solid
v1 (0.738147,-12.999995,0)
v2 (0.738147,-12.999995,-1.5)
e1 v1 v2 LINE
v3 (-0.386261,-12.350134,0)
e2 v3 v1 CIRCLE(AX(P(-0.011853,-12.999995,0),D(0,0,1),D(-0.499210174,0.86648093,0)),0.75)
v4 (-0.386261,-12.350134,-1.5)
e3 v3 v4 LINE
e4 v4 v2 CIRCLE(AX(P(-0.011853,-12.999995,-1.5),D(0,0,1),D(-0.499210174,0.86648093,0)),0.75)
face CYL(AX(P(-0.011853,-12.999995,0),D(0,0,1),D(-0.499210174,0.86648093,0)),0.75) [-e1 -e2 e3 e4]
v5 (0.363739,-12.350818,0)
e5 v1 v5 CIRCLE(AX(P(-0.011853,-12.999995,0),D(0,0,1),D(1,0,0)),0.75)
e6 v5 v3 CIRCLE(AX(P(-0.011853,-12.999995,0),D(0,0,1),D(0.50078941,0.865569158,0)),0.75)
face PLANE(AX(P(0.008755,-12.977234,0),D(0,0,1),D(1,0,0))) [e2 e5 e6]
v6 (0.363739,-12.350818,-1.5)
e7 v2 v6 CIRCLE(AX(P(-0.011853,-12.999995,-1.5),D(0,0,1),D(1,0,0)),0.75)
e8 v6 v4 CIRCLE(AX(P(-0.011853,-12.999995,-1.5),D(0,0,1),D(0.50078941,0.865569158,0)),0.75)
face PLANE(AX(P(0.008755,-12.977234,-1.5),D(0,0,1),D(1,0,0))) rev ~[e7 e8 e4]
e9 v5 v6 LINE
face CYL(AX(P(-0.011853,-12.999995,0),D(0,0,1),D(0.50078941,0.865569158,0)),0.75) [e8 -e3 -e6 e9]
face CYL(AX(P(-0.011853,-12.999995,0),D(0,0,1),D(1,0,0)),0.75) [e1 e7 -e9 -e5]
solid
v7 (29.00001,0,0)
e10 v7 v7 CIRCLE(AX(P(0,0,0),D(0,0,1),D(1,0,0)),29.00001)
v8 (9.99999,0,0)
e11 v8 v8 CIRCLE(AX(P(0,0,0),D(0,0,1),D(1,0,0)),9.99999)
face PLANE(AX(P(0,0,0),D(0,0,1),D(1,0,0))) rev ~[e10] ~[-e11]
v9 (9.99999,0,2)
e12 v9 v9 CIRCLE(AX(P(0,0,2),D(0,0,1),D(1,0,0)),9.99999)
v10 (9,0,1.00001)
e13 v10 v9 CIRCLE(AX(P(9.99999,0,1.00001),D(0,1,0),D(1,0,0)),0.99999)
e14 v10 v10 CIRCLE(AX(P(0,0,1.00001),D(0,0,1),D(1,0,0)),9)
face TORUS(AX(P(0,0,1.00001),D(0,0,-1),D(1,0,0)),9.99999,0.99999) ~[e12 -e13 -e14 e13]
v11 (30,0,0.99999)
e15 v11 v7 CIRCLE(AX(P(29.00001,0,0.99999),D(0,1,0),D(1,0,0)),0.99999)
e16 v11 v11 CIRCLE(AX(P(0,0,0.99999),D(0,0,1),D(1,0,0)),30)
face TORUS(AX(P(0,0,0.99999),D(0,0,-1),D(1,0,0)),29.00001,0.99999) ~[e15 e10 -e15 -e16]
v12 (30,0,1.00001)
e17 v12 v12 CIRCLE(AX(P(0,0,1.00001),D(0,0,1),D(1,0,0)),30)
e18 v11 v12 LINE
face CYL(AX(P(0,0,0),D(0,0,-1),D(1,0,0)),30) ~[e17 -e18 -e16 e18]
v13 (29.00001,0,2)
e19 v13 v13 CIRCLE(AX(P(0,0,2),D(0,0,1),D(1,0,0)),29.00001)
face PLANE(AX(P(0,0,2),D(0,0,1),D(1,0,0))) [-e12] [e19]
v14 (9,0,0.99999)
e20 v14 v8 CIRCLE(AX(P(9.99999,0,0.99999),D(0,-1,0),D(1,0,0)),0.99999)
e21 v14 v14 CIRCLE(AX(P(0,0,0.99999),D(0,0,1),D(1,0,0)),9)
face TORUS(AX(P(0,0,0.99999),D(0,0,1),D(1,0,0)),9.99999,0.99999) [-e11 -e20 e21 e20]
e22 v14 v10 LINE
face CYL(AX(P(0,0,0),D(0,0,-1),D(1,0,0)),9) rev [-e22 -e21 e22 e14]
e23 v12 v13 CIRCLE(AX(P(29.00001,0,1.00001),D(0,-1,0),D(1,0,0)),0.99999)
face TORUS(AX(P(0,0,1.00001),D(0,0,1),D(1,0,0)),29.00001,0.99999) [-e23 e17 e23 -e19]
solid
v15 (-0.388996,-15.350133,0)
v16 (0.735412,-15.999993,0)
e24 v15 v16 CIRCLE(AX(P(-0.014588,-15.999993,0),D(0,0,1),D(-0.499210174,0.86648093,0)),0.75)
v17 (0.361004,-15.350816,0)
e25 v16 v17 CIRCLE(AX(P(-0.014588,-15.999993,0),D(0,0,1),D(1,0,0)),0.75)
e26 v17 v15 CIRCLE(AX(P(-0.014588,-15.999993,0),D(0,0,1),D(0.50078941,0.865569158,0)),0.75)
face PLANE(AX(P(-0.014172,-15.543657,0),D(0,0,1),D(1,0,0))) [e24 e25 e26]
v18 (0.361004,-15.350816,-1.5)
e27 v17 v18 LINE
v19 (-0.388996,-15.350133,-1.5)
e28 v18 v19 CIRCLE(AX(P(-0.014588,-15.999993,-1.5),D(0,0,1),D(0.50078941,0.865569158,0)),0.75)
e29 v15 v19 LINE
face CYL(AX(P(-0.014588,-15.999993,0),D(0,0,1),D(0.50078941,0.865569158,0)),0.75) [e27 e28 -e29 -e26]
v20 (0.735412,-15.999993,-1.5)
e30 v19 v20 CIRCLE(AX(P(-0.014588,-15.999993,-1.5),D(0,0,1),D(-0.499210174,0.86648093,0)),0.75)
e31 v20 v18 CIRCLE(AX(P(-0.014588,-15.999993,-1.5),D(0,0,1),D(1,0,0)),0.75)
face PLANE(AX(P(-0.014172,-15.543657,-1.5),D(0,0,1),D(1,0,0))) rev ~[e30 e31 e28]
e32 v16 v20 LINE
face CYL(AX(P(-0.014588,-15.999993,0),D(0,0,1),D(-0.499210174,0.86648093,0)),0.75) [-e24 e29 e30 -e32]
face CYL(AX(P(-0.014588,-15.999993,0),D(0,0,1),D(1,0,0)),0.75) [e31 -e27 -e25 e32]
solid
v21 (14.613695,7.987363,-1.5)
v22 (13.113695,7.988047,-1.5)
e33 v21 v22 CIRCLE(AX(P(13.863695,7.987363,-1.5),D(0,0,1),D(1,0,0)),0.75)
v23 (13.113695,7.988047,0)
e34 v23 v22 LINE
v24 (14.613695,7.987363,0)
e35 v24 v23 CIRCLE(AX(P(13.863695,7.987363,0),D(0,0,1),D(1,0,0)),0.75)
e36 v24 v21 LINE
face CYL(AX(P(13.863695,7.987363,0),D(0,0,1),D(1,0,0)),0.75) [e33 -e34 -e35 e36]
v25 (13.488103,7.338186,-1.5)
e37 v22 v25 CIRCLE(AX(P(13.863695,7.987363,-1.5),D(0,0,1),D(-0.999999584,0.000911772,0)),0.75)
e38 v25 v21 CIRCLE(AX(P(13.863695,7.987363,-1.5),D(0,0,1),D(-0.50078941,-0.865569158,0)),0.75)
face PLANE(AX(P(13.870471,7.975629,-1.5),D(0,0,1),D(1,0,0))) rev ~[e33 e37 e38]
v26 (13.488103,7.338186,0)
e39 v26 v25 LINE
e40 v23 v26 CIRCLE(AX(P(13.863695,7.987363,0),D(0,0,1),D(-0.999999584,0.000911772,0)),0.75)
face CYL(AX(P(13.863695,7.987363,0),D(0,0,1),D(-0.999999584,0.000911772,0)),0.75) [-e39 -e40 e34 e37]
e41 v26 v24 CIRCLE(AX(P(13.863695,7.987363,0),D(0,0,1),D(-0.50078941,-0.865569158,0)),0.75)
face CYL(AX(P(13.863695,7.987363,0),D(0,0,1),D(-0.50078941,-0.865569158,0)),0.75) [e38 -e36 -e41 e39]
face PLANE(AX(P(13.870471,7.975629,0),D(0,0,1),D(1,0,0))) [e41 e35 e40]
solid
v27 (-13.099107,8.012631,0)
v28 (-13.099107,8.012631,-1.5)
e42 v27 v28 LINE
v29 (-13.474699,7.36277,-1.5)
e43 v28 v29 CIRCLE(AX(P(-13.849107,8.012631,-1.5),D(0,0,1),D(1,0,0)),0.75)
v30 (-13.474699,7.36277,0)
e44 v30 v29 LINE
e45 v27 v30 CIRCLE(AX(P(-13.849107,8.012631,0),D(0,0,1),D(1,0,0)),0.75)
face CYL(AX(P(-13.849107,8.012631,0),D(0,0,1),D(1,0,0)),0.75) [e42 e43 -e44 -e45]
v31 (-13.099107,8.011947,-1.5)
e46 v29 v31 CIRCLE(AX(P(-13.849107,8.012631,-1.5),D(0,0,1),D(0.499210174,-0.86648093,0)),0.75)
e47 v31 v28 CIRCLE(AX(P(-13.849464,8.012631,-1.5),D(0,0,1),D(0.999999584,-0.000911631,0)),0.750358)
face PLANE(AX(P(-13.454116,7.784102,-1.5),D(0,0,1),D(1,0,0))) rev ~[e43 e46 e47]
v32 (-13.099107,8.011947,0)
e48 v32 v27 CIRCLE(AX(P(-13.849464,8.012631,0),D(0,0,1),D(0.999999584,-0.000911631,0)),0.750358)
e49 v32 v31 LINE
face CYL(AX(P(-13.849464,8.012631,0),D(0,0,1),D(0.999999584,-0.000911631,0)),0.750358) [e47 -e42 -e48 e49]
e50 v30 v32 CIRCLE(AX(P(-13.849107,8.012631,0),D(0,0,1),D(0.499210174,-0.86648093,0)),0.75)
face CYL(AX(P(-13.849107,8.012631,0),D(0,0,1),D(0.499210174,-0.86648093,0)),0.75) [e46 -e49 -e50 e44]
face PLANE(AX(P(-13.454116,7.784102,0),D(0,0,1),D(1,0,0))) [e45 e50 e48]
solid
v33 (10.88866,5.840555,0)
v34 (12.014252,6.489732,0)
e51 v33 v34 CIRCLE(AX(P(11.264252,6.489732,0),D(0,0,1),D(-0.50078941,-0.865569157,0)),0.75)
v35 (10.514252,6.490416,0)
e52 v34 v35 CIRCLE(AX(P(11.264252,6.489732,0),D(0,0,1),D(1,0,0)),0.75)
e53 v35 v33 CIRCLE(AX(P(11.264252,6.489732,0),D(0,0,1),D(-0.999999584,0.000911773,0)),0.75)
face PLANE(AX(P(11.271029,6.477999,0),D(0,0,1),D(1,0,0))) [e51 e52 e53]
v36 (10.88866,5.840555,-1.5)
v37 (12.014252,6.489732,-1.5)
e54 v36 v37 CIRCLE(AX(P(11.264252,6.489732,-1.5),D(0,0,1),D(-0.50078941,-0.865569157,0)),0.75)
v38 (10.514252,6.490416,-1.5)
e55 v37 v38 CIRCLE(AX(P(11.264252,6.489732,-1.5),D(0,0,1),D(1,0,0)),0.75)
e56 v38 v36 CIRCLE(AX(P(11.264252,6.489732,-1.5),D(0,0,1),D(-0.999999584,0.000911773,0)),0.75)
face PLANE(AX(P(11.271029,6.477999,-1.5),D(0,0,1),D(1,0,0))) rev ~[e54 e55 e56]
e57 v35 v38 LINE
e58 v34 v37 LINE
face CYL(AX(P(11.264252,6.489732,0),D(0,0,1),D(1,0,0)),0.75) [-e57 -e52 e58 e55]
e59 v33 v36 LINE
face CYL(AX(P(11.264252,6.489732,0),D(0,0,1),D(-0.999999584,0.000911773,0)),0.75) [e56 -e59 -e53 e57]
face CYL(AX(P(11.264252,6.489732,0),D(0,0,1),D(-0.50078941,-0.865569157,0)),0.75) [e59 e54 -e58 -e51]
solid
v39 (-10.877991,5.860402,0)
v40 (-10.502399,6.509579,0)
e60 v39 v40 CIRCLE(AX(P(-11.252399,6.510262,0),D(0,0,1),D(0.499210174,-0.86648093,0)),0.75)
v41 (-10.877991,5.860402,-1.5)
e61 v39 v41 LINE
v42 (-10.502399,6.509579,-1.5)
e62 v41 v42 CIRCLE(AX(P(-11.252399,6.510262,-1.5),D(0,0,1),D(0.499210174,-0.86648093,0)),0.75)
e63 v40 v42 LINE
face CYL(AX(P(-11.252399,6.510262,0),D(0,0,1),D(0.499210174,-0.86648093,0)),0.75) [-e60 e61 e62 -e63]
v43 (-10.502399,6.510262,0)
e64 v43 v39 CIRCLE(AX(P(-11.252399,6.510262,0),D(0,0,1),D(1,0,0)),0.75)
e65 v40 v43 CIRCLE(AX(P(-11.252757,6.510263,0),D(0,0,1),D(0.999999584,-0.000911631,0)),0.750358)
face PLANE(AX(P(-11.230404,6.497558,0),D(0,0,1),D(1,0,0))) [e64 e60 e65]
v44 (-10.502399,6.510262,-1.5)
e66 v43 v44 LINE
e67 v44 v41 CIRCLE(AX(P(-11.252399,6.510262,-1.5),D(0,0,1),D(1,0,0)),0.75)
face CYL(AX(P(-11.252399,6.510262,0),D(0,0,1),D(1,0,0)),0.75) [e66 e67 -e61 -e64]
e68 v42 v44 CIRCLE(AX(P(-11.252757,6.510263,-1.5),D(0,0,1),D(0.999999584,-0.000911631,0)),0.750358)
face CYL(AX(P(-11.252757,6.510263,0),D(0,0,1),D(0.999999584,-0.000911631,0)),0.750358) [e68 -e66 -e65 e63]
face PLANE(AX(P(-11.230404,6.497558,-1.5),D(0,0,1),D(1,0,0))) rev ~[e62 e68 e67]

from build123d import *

# Parameters (mm, degrees)
F0_R     = 30
F0_R_2   = 9
F1_DEPTH = 2
F2_R     = 0.99999
F4_DEPTH = 1.5


# Not quite as in the source:
# - a fillet or chamfer is up to 0.001 mm smaller than in the source, because OpenCascade refuses the exact size


with BuildPart() as f1:
    # F0 (on Top) → F1 (new body)
    with BuildSketch(Plane.XY):
        Circle(F0_R)
        Circle(F0_R_2, mode=Mode.SUBTRACT)
    extrude(amount=F1_DEPTH)

    # F2 (radius 1 in the source; OpenCascade refuses exactly that, so slightly less here)
    f2_edges = [f1.edges().sort_by_distance(p)[0] for p in [
        (-9, 0, 2),
        (-9, 0, 0),
        (-30, 0, 0),
        (-30, 0, 2),
    ]]
    fillet(f2_edges, radius=F2_R)


with BuildPart() as f4:
    # F3 (on Top) → F4 (new body)
    with BuildSketch(Plane.XY):
        with BuildLine():
            Line((13.1136951927, 7.9880466137), (13.863694881, 7.9873627843))
            Line((13.863694881, 7.9873627843), (13.4881028232, 7.3381859161))
            ThreePointArc((13.4881028232, 7.3381859161), (14.2383987351, 7.3376728416), (14.613694881, 7.9873627843))
            ThreePointArc((14.613694881, 7.9873627843), (13.8640367957, 8.7373627064), (13.1136951927, 7.9880466137))
        make_face()
        with BuildLine():
            Line((13.4881028232, 7.3381859161), (13.863694881, 7.9873627843))
            Line((13.863694881, 7.9873627843), (13.1136951927, 7.9880466137))
            ThreePointArc((13.1136951927, 7.9880466137), (13.2138341834, 7.6129551538), (13.4881028232, 7.3381859161))
        make_face()
    extrude(amount=-F4_DEPTH)


with BuildPart() as f4b:
    # F3 (on Top) → F4, piece 2 (new body)
    with BuildSketch(Plane.XY):
        with BuildLine():
            Line((10.5142524025, 6.4904160916), (11.2642520908, 6.4897322622))
            Line((11.2642520908, 6.4897322622), (10.888660033, 5.8405553941))
            ThreePointArc((10.888660033, 5.8405553941), (11.638955945, 5.8400423195), (12.0142520908, 6.4897322622))
            ThreePointArc((12.0142520908, 6.4897322622), (11.2645940055, 7.2397321843), (10.5142524025, 6.4904160916))
        make_face()
        with BuildLine():
            Line((10.888660033, 5.8405553941), (11.2642520908, 6.4897322622))
            Line((11.2642520908, 6.4897322622), (10.5142524025, 6.4904160916))
            ThreePointArc((10.5142524025, 6.4904160916), (10.6143913932, 6.1153246317), (10.888660033, 5.8405553941))
        make_face()
    extrude(amount=-F4_DEPTH)


with BuildPart() as f4c:
    # F3 (on Top) → F4, piece 3 (new body)
    with BuildSketch(Plane.XY):
        with BuildLine():
            ThreePointArc((-13.4746988904, 7.3627698675), (-13.1999296527, 7.6370385073), (-13.0991068327, 8.0119467357))
            Line((-13.0991068327, 8.0119467357), (-13.8491065209, 8.0126305651))
            Line((-13.8491065209, 8.0126305651), (-13.4746988904, 7.3627698675))
        make_face()
        with BuildLine():
            Line((-13.8491065209, 8.0126305651), (-13.0991068327, 8.0119467357))
            ThreePointArc((-13.0991068327, 8.0119467357), (-13.0991065989, 8.0122886504), (-13.0991065209, 8.0126305651))
            ThreePointArc((-13.0991065209, 8.0126305651), (-14.4984545489, 8.3879266329), (-13.4746988904, 7.3627698675))
            Line((-13.4746988904, 7.3627698675), (-13.8491065209, 8.0126305651))
        make_face()
    extrude(amount=-F4_DEPTH)


with BuildPart() as f4d:
    # F3 (on Top) → F4, piece 4 (new body)
    with BuildSketch(Plane.XY):
        with BuildLine():
            Line((-11.2523990482, 6.5102623341), (-10.50239936, 6.5095785047))
            ThreePointArc((-10.50239936, 6.5095785047), (-10.5023991262, 6.5099204194), (-10.5023990482, 6.5102623341))
            ThreePointArc((-10.5023990482, 6.5102623341), (-11.9017470762, 6.885558402), (-10.8779914177, 5.8604016366))
            Line((-10.8779914177, 5.8604016366), (-11.2523990482, 6.5102623341))
        make_face()
        with BuildLine():
            ThreePointArc((-10.8779914177, 5.8604016366), (-10.6032221801, 6.1346702764), (-10.50239936, 6.5095785047))
            Line((-10.50239936, 6.5095785047), (-11.2523990482, 6.5102623341))
            Line((-11.2523990482, 6.5102623341), (-10.8779914177, 5.8604016366))
        make_face()
    extrude(amount=-F4_DEPTH)


with BuildPart() as f4e:
    # F3 (on Top) → F4, piece 5 (new body)
    with BuildSketch(Plane.XY):
        with BuildLine():
            ThreePointArc((0.7381469575, -12.9999945964), (0.6378369002, -12.6252907422), (0.3637390152, -12.3508177282))
            Line((0.3637390152, -12.3508177282), (-0.0118530425, -12.9999945964))
            Line((-0.0118530425, -12.9999945964), (-0.386260673, -12.3501338988))
            ThreePointArc((-0.386260673, -12.3501338988), (-0.3871491104, -13.6493426243), (0.7381469575, -12.9999945964))
        make_face()
        with BuildLine():
            Line((-0.0118530425, -12.9999945964), (0.3637390152, -12.3508177282))
            ThreePointArc((0.3637390152, -12.3508177282), (-0.0111692132, -12.2499949081), (-0.386260673, -12.3501338988))
            Line((-0.386260673, -12.3501338988), (-0.0118530425, -12.9999945964))
        make_face()
    extrude(amount=-F4_DEPTH)


with BuildPart() as f4f:
    # F3 (on Top) → F4, piece 6 (new body)
    with BuildSketch(Plane.XY):
        with BuildLine():
            Line((-0.01458836, -15.9999933494), (0.3610036977, -15.3508164812))
            ThreePointArc((0.3610036977, -15.3508164812), (-0.0139045307, -15.2499936611), (-0.3889959906, -15.3501326518))
            Line((-0.3889959906, -15.3501326518), (-0.01458836, -15.9999933494))
        make_face()
        with BuildLine():
            ThreePointArc((0.73541164, -15.9999933494), (0.6351015827, -15.6252894952), (0.3610036977, -15.3508164812))
            Line((0.3610036977, -15.3508164812), (-0.01458836, -15.9999933494))
            Line((-0.01458836, -15.9999933494), (-0.3889959906, -15.3501326518))
            ThreePointArc((-0.3889959906, -15.3501326518), (-0.3898844279, -16.6493413773), (0.73541164, -15.9999933494))
        make_face()
    extrude(amount=-F4_DEPTH)


solid = Compound([f1.part, f4.part, f4b.part, f4c.part, f4d.part, f4e.part, f4f.part])
